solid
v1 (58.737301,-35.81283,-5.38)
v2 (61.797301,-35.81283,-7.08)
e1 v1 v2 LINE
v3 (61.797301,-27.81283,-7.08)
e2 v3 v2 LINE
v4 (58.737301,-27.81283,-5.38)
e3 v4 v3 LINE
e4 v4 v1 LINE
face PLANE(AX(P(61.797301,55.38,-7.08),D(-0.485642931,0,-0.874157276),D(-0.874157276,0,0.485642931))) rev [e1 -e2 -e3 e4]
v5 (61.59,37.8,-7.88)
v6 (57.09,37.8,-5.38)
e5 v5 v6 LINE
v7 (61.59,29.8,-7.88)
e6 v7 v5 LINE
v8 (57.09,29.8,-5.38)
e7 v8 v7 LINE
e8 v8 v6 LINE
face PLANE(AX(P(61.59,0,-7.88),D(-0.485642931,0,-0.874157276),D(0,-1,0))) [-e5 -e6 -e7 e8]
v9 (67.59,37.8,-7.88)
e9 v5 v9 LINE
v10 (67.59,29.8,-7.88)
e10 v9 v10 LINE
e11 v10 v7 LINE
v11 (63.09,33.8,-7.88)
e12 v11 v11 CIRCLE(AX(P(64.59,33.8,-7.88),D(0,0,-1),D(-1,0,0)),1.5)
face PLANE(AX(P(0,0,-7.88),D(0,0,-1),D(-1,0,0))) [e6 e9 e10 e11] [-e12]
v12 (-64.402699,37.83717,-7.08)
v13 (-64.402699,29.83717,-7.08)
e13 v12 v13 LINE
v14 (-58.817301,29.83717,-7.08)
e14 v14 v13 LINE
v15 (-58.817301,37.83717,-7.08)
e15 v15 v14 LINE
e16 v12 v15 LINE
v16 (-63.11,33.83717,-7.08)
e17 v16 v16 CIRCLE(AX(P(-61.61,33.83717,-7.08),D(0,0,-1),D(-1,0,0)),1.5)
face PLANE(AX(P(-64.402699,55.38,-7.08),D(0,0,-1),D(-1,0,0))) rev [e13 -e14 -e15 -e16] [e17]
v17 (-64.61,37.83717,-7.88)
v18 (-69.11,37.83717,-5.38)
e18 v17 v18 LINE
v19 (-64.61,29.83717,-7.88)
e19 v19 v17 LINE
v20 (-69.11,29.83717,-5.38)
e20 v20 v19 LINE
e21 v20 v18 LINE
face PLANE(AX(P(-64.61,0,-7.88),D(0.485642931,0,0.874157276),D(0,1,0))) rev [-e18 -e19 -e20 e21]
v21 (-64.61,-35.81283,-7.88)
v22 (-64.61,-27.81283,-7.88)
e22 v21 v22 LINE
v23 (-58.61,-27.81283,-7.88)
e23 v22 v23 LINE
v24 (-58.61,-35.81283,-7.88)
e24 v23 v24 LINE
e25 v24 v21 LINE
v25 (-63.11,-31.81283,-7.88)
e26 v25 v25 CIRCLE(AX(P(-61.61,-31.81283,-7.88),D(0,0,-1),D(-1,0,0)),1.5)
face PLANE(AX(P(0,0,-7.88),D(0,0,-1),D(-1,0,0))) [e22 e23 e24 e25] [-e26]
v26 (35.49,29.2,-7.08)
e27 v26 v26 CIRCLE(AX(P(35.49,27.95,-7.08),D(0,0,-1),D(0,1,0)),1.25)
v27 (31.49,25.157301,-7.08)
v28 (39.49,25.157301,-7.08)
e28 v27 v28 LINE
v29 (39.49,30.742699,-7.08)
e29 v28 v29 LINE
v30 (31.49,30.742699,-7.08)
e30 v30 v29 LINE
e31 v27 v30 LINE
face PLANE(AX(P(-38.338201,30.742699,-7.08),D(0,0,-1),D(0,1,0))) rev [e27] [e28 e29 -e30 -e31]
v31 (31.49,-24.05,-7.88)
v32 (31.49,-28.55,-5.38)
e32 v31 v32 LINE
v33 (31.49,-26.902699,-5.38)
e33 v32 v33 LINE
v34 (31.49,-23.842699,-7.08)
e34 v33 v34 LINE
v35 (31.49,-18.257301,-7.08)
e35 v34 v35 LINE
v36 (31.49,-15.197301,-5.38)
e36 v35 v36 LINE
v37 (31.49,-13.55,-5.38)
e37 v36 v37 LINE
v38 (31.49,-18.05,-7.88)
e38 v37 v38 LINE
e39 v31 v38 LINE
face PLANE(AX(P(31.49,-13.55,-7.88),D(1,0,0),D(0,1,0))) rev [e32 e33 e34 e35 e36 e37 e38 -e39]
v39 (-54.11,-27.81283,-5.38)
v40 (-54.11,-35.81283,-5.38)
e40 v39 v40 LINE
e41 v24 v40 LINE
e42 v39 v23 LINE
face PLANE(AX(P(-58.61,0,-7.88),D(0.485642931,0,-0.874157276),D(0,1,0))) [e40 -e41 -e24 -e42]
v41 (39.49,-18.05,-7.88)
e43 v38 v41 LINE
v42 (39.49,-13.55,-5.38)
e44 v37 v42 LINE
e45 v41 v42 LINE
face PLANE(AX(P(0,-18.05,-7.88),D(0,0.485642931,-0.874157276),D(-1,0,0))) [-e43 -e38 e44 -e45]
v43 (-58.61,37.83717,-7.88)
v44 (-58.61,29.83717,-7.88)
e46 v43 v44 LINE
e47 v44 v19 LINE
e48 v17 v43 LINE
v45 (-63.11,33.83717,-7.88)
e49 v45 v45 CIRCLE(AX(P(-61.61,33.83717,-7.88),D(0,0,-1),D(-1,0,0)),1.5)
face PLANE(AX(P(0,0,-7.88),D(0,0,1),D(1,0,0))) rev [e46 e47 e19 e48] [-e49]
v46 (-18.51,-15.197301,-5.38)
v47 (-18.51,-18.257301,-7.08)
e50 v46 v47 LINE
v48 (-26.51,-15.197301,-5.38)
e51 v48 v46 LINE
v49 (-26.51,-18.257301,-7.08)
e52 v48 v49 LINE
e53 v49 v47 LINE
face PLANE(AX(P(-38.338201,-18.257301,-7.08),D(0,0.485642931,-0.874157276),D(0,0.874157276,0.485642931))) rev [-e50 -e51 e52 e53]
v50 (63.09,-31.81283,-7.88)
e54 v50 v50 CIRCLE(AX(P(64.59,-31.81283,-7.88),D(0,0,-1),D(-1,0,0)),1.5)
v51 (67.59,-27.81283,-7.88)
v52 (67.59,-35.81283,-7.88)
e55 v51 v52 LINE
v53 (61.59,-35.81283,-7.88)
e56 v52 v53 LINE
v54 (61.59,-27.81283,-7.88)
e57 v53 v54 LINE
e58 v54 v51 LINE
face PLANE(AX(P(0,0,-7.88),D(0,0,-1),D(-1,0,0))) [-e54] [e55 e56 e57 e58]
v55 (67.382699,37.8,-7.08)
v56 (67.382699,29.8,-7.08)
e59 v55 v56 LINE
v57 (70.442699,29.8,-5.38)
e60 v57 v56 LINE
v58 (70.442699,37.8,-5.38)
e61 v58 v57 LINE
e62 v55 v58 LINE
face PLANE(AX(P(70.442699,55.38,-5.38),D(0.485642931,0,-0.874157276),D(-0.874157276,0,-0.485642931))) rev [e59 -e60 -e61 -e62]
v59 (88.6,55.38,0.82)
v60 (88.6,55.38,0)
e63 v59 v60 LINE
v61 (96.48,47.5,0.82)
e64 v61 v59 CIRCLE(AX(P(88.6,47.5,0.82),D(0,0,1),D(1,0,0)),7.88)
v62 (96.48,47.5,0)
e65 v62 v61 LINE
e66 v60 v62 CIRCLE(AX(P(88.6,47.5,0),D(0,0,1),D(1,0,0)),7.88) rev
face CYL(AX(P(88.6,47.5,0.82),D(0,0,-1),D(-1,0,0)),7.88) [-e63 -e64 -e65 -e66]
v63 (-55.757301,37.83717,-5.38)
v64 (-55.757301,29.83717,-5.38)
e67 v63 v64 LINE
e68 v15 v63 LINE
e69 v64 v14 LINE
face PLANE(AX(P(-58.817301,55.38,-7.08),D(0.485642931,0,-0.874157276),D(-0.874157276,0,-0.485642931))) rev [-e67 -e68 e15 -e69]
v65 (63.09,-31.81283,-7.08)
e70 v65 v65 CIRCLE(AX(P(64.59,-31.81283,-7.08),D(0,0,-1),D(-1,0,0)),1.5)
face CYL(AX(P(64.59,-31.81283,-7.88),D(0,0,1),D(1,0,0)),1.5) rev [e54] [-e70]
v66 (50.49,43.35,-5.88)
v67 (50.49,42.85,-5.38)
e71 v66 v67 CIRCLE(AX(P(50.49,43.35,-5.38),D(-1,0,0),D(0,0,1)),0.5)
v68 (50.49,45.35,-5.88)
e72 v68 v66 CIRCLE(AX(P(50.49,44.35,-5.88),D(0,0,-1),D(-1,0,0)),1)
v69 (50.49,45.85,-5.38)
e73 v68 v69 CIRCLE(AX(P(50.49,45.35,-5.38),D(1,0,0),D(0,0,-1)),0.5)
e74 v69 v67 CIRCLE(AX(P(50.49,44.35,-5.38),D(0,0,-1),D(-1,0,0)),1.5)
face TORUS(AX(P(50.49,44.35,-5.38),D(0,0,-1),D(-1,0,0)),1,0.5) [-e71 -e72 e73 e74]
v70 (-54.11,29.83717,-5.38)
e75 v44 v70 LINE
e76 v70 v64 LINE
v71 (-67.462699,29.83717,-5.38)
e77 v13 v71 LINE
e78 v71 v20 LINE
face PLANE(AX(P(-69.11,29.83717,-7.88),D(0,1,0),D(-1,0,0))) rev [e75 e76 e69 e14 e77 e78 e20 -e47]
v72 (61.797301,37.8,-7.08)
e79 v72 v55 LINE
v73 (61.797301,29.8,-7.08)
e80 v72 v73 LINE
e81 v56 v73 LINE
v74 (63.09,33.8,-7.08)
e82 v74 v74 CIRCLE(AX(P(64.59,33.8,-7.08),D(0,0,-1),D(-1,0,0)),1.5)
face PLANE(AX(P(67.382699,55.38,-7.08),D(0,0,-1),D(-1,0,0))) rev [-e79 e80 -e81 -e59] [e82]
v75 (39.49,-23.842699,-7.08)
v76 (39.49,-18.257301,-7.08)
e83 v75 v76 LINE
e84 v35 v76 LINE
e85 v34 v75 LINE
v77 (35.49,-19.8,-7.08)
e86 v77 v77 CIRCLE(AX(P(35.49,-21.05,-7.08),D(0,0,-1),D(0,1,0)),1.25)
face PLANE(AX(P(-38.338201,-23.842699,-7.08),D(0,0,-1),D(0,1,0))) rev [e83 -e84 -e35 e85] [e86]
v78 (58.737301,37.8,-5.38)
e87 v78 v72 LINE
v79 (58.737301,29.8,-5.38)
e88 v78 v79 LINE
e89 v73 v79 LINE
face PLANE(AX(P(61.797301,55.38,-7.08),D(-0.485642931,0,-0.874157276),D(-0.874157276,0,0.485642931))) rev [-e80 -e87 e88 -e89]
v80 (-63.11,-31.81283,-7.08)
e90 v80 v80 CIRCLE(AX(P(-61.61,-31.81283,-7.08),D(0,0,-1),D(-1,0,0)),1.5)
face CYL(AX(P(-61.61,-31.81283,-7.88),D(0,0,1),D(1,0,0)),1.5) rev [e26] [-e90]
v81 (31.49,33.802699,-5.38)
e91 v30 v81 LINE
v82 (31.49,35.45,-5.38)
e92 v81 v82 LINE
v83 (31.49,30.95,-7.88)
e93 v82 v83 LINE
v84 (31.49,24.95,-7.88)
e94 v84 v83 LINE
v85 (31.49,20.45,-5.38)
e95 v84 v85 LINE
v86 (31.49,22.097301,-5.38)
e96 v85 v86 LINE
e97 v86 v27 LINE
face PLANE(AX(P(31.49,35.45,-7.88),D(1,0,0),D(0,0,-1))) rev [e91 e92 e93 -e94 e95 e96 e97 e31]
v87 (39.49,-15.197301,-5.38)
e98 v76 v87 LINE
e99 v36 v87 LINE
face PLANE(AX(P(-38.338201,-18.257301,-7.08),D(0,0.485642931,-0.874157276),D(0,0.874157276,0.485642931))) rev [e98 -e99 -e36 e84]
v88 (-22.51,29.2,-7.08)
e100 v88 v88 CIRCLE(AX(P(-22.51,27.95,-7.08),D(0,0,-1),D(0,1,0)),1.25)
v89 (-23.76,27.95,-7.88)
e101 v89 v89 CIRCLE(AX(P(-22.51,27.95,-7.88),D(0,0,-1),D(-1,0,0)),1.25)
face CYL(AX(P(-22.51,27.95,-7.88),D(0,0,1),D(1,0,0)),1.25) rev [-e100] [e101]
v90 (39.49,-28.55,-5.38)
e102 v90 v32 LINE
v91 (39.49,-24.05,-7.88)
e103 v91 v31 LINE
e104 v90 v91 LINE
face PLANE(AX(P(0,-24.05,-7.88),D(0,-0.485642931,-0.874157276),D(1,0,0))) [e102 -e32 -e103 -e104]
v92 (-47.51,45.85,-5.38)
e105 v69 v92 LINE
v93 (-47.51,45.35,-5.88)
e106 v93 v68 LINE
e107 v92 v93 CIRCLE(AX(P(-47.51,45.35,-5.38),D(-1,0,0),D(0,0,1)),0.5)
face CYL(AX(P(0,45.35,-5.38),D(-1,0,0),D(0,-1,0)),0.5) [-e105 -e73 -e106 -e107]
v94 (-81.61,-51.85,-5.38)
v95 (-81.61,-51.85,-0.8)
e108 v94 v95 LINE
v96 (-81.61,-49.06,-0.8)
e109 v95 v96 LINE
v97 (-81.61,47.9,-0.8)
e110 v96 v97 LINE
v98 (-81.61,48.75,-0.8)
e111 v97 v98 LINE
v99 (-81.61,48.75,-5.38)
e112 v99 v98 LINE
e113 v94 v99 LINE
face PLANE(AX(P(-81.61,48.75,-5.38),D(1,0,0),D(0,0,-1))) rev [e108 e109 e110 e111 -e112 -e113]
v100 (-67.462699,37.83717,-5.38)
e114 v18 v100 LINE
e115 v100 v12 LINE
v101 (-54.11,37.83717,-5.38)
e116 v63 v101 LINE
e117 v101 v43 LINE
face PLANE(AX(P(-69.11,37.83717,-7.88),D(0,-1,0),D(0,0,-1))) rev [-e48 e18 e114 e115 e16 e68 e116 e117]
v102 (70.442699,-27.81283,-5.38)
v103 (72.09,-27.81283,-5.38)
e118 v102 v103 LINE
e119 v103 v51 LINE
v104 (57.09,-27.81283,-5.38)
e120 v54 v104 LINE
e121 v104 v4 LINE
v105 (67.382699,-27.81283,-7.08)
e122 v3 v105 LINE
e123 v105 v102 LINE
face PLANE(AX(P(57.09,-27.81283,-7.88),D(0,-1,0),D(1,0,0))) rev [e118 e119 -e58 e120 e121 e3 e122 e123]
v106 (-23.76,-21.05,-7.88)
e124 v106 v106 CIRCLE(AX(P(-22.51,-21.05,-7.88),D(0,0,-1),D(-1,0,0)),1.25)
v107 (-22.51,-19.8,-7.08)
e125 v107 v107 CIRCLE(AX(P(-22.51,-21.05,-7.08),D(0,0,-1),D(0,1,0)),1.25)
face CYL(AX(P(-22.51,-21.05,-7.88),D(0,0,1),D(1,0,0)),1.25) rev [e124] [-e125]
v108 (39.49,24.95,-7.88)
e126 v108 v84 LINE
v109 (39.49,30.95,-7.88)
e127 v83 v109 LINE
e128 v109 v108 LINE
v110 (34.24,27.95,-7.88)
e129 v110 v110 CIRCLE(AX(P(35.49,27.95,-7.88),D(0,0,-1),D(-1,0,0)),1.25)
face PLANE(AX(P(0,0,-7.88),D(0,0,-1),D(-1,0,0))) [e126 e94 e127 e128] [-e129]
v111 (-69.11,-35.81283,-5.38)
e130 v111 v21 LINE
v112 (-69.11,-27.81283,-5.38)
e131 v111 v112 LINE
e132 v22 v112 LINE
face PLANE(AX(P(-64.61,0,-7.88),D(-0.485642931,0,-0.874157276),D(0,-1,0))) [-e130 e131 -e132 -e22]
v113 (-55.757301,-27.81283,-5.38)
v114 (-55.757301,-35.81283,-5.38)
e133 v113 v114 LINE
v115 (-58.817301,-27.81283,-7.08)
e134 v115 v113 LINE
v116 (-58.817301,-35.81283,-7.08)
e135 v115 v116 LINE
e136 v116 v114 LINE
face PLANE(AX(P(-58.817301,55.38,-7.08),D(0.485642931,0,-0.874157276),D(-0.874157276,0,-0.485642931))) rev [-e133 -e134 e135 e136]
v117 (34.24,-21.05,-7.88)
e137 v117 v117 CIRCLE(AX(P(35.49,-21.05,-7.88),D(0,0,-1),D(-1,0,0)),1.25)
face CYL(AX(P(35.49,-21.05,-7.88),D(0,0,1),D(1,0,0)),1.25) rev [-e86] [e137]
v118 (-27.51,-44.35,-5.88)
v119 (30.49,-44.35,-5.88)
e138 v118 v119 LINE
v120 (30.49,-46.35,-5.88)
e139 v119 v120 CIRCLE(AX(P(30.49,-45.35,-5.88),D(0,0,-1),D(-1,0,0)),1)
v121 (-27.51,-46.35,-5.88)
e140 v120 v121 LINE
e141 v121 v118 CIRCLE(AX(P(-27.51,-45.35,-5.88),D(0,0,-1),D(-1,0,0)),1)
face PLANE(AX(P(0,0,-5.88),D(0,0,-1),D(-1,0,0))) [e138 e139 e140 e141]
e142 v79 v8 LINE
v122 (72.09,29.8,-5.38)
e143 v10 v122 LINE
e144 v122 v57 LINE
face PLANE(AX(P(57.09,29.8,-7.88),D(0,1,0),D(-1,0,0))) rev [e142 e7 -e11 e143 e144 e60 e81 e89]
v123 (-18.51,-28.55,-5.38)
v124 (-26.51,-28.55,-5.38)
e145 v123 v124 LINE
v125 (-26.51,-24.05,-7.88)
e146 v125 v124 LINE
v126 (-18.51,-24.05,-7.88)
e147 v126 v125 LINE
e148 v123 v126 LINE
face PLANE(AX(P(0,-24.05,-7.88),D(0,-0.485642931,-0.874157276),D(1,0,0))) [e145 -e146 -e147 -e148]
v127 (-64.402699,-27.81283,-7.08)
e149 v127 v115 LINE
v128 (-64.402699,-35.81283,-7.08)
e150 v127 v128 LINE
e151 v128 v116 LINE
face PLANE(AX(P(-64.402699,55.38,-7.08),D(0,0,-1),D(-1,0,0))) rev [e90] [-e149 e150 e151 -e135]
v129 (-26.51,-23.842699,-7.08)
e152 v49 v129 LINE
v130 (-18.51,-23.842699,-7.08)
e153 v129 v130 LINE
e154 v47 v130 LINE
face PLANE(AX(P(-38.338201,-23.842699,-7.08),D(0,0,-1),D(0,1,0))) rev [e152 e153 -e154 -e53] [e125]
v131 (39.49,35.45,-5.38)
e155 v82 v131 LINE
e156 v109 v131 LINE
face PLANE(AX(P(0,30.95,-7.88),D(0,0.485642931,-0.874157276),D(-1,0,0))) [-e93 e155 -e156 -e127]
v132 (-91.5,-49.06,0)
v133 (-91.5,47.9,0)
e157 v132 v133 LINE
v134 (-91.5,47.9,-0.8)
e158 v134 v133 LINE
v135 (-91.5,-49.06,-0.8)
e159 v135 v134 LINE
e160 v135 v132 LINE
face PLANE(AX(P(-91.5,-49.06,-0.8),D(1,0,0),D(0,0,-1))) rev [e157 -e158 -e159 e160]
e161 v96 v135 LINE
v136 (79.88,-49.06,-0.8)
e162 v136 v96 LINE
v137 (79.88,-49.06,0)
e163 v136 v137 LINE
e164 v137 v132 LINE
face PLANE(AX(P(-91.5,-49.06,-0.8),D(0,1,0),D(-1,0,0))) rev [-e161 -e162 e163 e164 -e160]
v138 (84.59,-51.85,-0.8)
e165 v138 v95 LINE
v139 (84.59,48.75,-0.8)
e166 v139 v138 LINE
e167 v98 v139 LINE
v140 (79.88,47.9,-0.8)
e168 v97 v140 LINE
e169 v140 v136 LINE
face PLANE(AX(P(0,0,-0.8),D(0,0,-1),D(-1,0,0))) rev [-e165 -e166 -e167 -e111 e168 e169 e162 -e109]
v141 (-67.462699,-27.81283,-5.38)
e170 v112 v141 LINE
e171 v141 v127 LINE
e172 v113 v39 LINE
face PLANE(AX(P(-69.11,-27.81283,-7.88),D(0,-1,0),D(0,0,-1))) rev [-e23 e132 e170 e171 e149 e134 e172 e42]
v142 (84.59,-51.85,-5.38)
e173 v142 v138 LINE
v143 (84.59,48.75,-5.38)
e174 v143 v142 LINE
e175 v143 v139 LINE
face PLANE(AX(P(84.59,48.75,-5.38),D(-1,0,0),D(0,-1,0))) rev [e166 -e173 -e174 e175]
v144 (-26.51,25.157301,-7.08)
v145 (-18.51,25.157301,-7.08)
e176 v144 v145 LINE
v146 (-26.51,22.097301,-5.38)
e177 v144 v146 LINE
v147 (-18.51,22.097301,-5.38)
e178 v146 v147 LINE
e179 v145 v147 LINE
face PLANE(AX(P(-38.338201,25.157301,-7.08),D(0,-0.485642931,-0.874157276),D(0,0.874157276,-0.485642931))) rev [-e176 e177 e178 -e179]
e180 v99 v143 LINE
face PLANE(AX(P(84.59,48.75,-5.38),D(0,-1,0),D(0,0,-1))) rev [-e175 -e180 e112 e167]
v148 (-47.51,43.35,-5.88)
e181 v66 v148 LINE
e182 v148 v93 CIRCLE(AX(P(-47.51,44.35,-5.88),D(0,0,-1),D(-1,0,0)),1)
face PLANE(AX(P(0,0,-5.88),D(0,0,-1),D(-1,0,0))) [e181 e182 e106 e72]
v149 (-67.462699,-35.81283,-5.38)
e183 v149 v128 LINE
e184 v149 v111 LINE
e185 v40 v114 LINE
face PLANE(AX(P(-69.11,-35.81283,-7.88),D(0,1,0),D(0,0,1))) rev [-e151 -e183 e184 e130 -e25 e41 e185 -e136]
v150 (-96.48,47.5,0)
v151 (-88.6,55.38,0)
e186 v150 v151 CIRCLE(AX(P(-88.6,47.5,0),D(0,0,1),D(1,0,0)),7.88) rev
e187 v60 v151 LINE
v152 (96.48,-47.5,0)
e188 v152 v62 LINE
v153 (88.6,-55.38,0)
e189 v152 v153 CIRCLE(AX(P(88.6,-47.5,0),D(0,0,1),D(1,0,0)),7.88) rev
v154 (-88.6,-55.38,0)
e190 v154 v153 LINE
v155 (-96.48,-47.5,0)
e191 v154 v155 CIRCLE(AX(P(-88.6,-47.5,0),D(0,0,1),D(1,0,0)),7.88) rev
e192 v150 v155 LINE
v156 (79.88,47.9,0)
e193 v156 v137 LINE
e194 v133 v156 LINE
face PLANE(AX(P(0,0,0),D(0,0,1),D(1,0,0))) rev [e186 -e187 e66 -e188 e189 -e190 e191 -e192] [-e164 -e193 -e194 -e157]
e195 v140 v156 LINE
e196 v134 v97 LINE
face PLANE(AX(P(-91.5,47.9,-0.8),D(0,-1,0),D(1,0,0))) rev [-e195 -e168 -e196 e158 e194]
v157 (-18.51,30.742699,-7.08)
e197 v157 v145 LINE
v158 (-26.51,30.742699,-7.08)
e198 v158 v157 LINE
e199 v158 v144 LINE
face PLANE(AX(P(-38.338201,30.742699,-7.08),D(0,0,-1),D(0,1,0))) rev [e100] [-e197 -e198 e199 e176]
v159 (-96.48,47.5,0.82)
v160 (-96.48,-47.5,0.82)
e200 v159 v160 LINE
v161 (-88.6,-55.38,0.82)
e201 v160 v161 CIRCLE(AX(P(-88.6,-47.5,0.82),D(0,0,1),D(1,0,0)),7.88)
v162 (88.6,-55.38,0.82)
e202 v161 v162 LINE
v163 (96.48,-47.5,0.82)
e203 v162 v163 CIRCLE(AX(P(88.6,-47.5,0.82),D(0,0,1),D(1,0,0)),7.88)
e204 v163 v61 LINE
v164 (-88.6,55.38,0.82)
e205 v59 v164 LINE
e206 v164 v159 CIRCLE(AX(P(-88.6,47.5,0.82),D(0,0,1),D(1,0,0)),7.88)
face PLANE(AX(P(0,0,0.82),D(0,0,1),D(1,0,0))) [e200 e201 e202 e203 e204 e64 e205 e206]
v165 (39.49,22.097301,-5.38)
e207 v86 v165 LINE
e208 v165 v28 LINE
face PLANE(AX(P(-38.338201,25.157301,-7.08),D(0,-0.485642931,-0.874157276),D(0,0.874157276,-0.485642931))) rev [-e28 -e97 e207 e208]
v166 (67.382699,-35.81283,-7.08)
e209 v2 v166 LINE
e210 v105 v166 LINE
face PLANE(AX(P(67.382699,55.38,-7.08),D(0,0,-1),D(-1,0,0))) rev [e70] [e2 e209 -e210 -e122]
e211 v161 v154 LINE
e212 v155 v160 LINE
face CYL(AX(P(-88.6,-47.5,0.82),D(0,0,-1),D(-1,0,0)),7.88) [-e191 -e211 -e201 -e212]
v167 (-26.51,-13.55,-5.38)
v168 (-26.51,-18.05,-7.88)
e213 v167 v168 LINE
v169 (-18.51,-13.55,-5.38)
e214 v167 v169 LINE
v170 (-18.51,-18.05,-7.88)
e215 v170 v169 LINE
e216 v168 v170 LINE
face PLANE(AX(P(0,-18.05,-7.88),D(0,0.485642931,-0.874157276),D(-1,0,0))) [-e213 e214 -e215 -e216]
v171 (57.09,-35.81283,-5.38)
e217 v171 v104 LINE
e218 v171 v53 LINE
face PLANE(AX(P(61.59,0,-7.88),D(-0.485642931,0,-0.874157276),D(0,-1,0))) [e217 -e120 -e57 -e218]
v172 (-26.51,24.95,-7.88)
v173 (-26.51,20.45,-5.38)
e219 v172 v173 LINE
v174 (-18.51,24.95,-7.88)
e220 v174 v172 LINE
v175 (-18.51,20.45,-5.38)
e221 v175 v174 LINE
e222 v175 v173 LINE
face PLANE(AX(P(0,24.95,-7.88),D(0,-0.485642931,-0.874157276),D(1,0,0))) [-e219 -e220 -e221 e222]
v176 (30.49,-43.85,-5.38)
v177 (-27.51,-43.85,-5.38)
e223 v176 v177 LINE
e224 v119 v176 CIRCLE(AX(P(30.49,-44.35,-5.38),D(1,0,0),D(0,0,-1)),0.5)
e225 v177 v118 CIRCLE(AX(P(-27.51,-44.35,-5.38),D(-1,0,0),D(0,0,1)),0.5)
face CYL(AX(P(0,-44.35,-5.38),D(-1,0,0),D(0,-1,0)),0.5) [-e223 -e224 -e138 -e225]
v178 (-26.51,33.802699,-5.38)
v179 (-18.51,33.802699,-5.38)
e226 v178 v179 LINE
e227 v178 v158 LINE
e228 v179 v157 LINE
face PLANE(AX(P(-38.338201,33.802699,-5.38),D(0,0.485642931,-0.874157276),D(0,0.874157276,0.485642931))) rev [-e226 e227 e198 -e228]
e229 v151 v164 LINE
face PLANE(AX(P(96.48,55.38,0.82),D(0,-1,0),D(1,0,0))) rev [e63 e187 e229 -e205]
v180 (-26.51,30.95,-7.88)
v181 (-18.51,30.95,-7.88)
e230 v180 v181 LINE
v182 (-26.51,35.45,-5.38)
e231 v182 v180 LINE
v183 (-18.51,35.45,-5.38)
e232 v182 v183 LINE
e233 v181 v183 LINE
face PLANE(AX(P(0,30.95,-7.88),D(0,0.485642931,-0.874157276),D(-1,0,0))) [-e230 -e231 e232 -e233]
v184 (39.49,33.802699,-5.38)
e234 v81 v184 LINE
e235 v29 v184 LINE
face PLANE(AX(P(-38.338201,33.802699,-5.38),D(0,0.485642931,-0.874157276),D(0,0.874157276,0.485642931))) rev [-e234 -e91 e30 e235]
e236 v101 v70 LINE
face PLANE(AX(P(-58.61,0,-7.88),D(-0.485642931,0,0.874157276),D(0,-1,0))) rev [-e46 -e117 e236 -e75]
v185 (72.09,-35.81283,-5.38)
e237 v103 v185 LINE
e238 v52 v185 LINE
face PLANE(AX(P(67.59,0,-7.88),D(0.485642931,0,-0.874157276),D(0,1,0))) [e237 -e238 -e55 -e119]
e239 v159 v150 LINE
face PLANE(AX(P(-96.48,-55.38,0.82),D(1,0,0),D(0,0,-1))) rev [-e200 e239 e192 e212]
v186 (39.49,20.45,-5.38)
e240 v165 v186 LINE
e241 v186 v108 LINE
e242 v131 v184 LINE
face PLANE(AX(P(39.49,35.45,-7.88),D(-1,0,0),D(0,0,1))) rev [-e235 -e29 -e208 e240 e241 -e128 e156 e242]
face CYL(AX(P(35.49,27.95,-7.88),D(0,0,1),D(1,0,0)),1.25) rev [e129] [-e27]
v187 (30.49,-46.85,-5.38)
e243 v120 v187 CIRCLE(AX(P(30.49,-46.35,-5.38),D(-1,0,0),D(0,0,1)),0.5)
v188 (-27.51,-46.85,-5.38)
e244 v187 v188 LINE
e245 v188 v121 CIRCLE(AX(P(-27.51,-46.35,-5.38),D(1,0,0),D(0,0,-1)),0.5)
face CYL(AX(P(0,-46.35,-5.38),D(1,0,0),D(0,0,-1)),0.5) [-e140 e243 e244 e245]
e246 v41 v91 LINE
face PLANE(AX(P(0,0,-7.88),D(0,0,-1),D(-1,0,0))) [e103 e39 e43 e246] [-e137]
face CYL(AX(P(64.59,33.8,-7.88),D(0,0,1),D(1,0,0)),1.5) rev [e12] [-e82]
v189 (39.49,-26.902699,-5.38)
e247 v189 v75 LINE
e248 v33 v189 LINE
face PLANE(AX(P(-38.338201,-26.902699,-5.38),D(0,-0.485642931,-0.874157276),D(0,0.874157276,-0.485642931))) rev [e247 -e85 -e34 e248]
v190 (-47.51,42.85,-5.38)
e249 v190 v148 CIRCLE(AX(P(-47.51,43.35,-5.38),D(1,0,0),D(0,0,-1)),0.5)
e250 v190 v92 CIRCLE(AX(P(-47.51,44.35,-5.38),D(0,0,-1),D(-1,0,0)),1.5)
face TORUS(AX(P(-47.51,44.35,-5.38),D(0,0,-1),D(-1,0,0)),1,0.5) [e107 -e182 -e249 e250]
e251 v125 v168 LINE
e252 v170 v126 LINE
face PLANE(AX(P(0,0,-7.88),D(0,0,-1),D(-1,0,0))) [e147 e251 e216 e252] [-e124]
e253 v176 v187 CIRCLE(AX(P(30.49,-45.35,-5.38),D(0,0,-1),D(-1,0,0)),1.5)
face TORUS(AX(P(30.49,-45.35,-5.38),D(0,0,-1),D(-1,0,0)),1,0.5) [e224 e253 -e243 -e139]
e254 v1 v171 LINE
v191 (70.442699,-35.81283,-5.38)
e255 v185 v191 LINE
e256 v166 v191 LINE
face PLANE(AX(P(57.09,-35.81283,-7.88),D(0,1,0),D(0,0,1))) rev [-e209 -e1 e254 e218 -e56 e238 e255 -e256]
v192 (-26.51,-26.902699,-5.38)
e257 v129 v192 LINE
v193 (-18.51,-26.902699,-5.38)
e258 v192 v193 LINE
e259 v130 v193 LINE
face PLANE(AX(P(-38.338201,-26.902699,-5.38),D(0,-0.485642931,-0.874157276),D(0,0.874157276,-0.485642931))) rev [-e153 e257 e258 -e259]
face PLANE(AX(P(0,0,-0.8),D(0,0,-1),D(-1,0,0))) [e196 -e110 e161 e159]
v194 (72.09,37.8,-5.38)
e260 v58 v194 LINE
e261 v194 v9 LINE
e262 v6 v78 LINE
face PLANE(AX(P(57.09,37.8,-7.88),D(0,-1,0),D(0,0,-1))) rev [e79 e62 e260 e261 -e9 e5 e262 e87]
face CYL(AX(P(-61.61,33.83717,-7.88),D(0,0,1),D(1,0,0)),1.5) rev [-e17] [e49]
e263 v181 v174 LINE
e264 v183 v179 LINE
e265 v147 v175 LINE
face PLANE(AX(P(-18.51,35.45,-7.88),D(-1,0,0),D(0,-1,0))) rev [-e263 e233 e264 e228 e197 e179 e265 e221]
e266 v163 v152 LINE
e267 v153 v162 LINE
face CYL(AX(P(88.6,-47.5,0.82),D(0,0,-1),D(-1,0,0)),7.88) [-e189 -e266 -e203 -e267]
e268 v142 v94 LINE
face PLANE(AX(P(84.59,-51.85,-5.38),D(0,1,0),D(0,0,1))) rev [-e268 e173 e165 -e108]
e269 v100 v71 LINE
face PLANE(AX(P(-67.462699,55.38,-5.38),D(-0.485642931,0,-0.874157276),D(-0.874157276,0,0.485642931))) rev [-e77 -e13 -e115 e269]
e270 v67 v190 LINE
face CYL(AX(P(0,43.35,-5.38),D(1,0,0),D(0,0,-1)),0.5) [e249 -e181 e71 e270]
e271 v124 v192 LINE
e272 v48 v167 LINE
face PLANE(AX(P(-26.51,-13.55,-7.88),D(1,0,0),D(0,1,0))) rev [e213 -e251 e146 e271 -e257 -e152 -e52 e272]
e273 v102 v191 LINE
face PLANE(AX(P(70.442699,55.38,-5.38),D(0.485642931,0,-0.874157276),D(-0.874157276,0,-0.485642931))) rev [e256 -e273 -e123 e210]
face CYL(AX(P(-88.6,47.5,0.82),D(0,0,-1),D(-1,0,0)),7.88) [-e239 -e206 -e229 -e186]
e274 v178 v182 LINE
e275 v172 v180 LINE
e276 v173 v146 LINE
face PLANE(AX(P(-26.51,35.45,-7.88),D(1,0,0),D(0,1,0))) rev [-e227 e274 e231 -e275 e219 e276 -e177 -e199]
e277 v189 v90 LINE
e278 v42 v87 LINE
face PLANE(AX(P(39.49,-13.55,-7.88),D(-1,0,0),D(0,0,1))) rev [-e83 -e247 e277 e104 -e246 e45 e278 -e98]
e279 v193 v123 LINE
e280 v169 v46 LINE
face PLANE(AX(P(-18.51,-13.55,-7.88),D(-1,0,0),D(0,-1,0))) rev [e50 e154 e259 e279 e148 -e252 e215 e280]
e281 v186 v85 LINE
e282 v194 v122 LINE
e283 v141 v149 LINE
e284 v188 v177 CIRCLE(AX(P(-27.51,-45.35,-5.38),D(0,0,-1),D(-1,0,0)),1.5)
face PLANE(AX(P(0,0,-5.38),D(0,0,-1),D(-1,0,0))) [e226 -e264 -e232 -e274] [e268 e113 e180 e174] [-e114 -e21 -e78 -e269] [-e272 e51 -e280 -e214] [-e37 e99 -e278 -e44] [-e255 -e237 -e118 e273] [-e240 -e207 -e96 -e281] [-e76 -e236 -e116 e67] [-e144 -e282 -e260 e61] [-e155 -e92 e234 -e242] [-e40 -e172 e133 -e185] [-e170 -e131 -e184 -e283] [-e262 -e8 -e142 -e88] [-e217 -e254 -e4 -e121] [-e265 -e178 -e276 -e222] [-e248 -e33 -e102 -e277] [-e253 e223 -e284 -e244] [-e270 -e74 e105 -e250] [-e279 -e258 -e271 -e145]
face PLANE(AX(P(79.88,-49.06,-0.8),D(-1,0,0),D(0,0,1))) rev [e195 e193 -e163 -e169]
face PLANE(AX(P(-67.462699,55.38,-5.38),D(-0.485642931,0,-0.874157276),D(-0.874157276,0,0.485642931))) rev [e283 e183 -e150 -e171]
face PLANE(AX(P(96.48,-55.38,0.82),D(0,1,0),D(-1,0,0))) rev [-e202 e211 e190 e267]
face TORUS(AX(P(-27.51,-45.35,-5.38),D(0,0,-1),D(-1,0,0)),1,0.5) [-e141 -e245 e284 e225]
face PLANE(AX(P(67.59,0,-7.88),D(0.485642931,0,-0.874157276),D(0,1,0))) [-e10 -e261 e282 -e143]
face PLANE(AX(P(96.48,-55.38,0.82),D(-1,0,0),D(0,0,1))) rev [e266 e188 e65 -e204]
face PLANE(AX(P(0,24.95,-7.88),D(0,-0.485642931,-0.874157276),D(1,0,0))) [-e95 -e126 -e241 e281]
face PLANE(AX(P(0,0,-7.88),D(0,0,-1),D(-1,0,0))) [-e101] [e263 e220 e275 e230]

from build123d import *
from OCP.BRepFilletAPI import BRepFilletAPI_MakeChamfer

# Parameters (mm, degrees)
ESQUISSE1_W             = 192.96
ESQUISSE1_H             = 110.76
C_VITRE_DEPTH           = 0.82
CONG_1_R                = 7.88
ESQUISSE2_W             = 171.38
ESQUISSE2_H             = 96.96
C_TOUCH_DEPTH           = 0.8
ESQUISSE3_W             = 166.2
ESQUISSE3_H             = 100.6
BOSS_EXTRU_3_DEPTH      = 4.58
ESQUISSE4_W             = 15
ESQUISSE4_H             = 8
ESQUISSE4_R             = 1.5
ESQUISSE4_W_2           = 8
ESQUISSE4_H_2           = 15
ESQUISSE4_R_2           = 1.25
BOSS_EXTRU_4_DEPTH      = 2.5
CHANFREIN1_SIZE         = 2.5
CHANFREIN1_SIZE_2       = 4.5
BOSS_EXTRU_5_DEPTH      = 0.5
CONG_2_R                = 0.5
ENL_V_MAT_EXTRU_1_DEPTH = 133.991041409
ENL_V_MAT_EXTRU_2_REACH = 149.027
ENL_V_MAT_EXTRU_3_REACH = 149.027


with BuildPart() as part:
    # Esquisse1 → c_vitre (new body)
    with BuildSketch(Plane.XY):
        Rectangle(ESQUISSE1_W, ESQUISSE1_H)
    extrude(amount=C_VITRE_DEPTH)

    # Congé1
    cong_1_edges = [part.edges().sort_by_distance(p)[0] for p in [
        (-96.48, 55.38, 0.41),
        (96.48, 55.38, 0.41),
        (96.48, -55.38, 0.41),
        (-96.48, -55.38, 0.41),
    ]]
    fillet(cong_1_edges, radius=CONG_1_R)

    # Esquisse2 → c_touch (add)
    with BuildSketch(Plane(origin=(0, 0, 0), x_dir=(-1, 0, 0), z_dir=(0, 0, -1))):
        with Locations((5.81, -0.58)):
            Rectangle(ESQUISSE2_W, ESQUISSE2_H)
    extrude(amount=C_TOUCH_DEPTH)

    # Esquisse3 → Boss.-Extru.3 (add)
    with BuildSketch(Plane(origin=(0, 0, -0.8), x_dir=(-1, 0, 0), z_dir=(0, 0, -1))):
        with Locations((-1.49, -1.55)):
            Rectangle(ESQUISSE3_W, ESQUISSE3_H)
    extrude(amount=BOSS_EXTRU_3_DEPTH)

    # Esquisse4 → Boss.-Extru.4 (add)
    # profile 1 of 8: a face of its own
    with BuildSketch(Plane(origin=(0, 0, -5.38), x_dir=(-1, 0, 0), z_dir=(0, 0, -1))):
        with Locations((-64.59, 33.8)):
            Rectangle(ESQUISSE4_W, ESQUISSE4_H)
        with Locations((-64.59, 33.8)):
            Circle(ESQUISSE4_R, mode=Mode.SUBTRACT)
    # profile 2 of 8: a face of its own
    with BuildSketch(Plane(origin=(0, 0, -5.38), x_dir=(-1, 0, 0), z_dir=(0, 0, -1))):
        with Locations((-64.59, -31.812830284)):
            Rectangle(ESQUISSE4_W, ESQUISSE4_H)
        with Locations((-64.59, -31.812830284)):
            Circle(ESQUISSE4_R, mode=Mode.SUBTRACT)
    # profile 3 of 8: a face of its own
    with BuildSketch(Plane(origin=(0, 0, -5.38), x_dir=(-1, 0, 0), z_dir=(0, 0, -1))):
        with Locations((61.61, -31.812830284)):
            Rectangle(ESQUISSE4_W, ESQUISSE4_H)
        with Locations((61.61, -31.812830284)):
            Circle(ESQUISSE4_R, mode=Mode.SUBTRACT)
    # profile 4 of 8: a face of its own
    with BuildSketch(Plane(origin=(0, 0, -5.38), x_dir=(-1, 0, 0), z_dir=(0, 0, -1))):
        with Locations((61.61, 33.837169716)):
            Rectangle(ESQUISSE4_W, ESQUISSE4_H)
        with Locations((61.61, 33.837169716)):
            Circle(ESQUISSE4_R, mode=Mode.SUBTRACT)
    # profile 5 of 8: a face of its own
    with BuildSketch(Plane(origin=(0, 0, -5.38), x_dir=(-1, 0, 0), z_dir=(0, 0, -1))):
        with Locations((-35.49, 27.95)):
            Rectangle(ESQUISSE4_W_2, ESQUISSE4_H_2)
        with Locations((-35.49, 27.95)):
            Circle(ESQUISSE4_R_2, mode=Mode.SUBTRACT)
    # profile 6 of 8: a face of its own
    with BuildSketch(Plane(origin=(0, 0, -5.38), x_dir=(-1, 0, 0), z_dir=(0, 0, -1))):
        with Locations((-35.49, -21.05)):
            Rectangle(ESQUISSE4_W_2, ESQUISSE4_H_2)
        with Locations((-35.49, -21.05)):
            Circle(ESQUISSE4_R_2, mode=Mode.SUBTRACT)
    # profile 7 of 8: a face of its own
    with BuildSketch(Plane(origin=(0, 0, -5.38), x_dir=(-1, 0, 0), z_dir=(0, 0, -1))):
        with Locations((22.51, -21.05)):
            Rectangle(ESQUISSE4_W_2, ESQUISSE4_H_2)
        with Locations((22.51, -21.05)):
            Circle(ESQUISSE4_R_2, mode=Mode.SUBTRACT)
    # profile 8 of 8: a face of its own
    with BuildSketch(Plane(origin=(0, 0, -5.38), x_dir=(-1, 0, 0), z_dir=(0, 0, -1))):
        with Locations((22.51, 27.95)):
            Rectangle(ESQUISSE4_W_2, ESQUISSE4_H_2)
        with Locations((22.51, 27.95)):
            Circle(ESQUISSE4_R_2, mode=Mode.SUBTRACT)
    extrude(amount=BOSS_EXTRU_4_DEPTH)

    # Chanfrein1
    chanfrein1_edges_1 = [part.edges().sort_by_distance(p)[0] for p in [
        (-69.11, -31.812830284, -7.88),
    ]]
    chanfrein1_side_1 = [part.faces().sort_by_distance(p)[0] for p in [
        (-69.11, -31.812830284, -7.83),
    ]]
    chanfrein1_edges_2 = [part.edges().sort_by_distance(p)[0] for p in [
        (-54.11, -31.812830284, -7.88),
    ]]
    chanfrein1_side_2 = [part.faces().sort_by_distance(p)[0] for p in [
        (-54.11, -31.812830284, -7.83),
    ]]
    chanfrein1_edges_3 = [part.edges().sort_by_distance(p)[0] for p in [
        (-22.51, -28.55, -7.88),
    ]]
    chanfrein1_side_3 = [part.faces().sort_by_distance(p)[0] for p in [
        (-22.51, -28.55, -7.83),
    ]]
    chanfrein1_edges_4 = [part.edges().sort_by_distance(p)[0] for p in [
        (-22.51, -13.55, -7.88),
    ]]
    chanfrein1_side_4 = [part.faces().sort_by_distance(p)[0] for p in [
        (-22.51, -13.55, -7.83),
    ]]
    chanfrein1_edges_5 = [part.edges().sort_by_distance(p)[0] for p in [
        (-69.11, 33.837169716, -7.88),
    ]]
    chanfrein1_side_5 = [part.faces().sort_by_distance(p)[0] for p in [
        (-69.11, 33.837169716, -7.83),
    ]]
    chanfrein1_edges_6 = [part.edges().sort_by_distance(p)[0] for p in [
        (-54.11, 33.837169716, -7.88),
    ]]
    chanfrein1_side_6 = [part.faces().sort_by_distance(p)[0] for p in [
        (-54.11, 33.837169716, -7.83),
    ]]
    chanfrein1_edges_7 = [part.edges().sort_by_distance(p)[0] for p in [
        (-22.51, 20.45, -7.88),
    ]]
    chanfrein1_side_7 = [part.faces().sort_by_distance(p)[0] for p in [
        (-22.51, 20.45, -7.83),
    ]]
    chanfrein1_edges_8 = [part.edges().sort_by_distance(p)[0] for p in [
        (-22.51, 35.45, -7.88),
    ]]
    chanfrein1_side_8 = [part.faces().sort_by_distance(p)[0] for p in [
        (-22.51, 35.45, -7.83),
    ]]
    chanfrein1_edges_9 = [part.edges().sort_by_distance(p)[0] for p in [
        (35.49, 35.45, -7.88),
    ]]
    chanfrein1_side_9 = [part.faces().sort_by_distance(p)[0] for p in [
        (35.49, 35.45, -7.83),
    ]]
    chanfrein1_edges_10 = [part.edges().sort_by_distance(p)[0] for p in [
        (57.09, 33.8, -7.88),
    ]]
    chanfrein1_side_10 = [part.faces().sort_by_distance(p)[0] for p in [
        (57.09, 33.8, -7.83),
    ]]
    chanfrein1_edges_11 = [part.edges().sort_by_distance(p)[0] for p in [
        (72.09, 33.8, -7.88),
    ]]
    chanfrein1_side_11 = [part.faces().sort_by_distance(p)[0] for p in [
        (72.09, 33.8, -7.83),
    ]]
    chanfrein1_edges_12 = [part.edges().sort_by_distance(p)[0] for p in [
        (35.49, 20.45, -7.88),
    ]]
    chanfrein1_side_12 = [part.faces().sort_by_distance(p)[0] for p in [
        (35.49, 20.45, -7.83),
    ]]
    chanfrein1_edges_13 = [part.edges().sort_by_distance(p)[0] for p in [
        (35.49, -13.55, -7.88),
    ]]
    chanfrein1_side_13 = [part.faces().sort_by_distance(p)[0] for p in [
        (35.49, -13.55, -7.83),
    ]]
    chanfrein1_edges_14 = [part.edges().sort_by_distance(p)[0] for p in [
        (35.49, -28.55, -7.88),
    ]]
    chanfrein1_side_14 = [part.faces().sort_by_distance(p)[0] for p in [
        (35.49, -28.55, -7.83),
    ]]
    chanfrein1_edges_15 = [part.edges().sort_by_distance(p)[0] for p in [
        (57.09, -31.812830284, -7.88),
    ]]
    chanfrein1_side_15 = [part.faces().sort_by_distance(p)[0] for p in [
        (57.09, -31.812830284, -7.83),
    ]]
    chanfrein1_edges_16 = [part.edges().sort_by_distance(p)[0] for p in [
        (72.09, -31.812830284, -7.88),
    ]]
    chanfrein1_side_16 = [part.faces().sort_by_distance(p)[0] for p in [
        (72.09, -31.812830284, -7.83),
    ]]
    chanfrein1 = BRepFilletAPI_MakeChamfer(part.part.solid().wrapped)
    for e in chanfrein1_edges_1:
        chanfrein1.Add(CHANFREIN1_SIZE - 0.0001, CHANFREIN1_SIZE_2 - 0.0001, e.wrapped, chanfrein1_side_1[0].wrapped)
    for e in chanfrein1_edges_2:
        chanfrein1.Add(CHANFREIN1_SIZE - 0.0001, CHANFREIN1_SIZE_2 - 0.0001, e.wrapped, chanfrein1_side_2[0].wrapped)
    for e in chanfrein1_edges_3:
        chanfrein1.Add(CHANFREIN1_SIZE - 0.0001, CHANFREIN1_SIZE_2 - 0.0001, e.wrapped, chanfrein1_side_3[0].wrapped)
    for e in chanfrein1_edges_4:
        chanfrein1.Add(CHANFREIN1_SIZE - 0.0001, CHANFREIN1_SIZE_2 - 0.0001, e.wrapped, chanfrein1_side_4[0].wrapped)
    for e in chanfrein1_edges_5:
        chanfrein1.Add(CHANFREIN1_SIZE - 0.0001, CHANFREIN1_SIZE_2 - 0.0001, e.wrapped, chanfrein1_side_5[0].wrapped)
    for e in chanfrein1_edges_6:
        chanfrein1.Add(CHANFREIN1_SIZE - 0.0001, CHANFREIN1_SIZE_2 - 0.0001, e.wrapped, chanfrein1_side_6[0].wrapped)
    for e in chanfrein1_edges_7:
        chanfrein1.Add(CHANFREIN1_SIZE - 0.0001, CHANFREIN1_SIZE_2 - 0.0001, e.wrapped, chanfrein1_side_7[0].wrapped)
    for e in chanfrein1_edges_8:
        chanfrein1.Add(CHANFREIN1_SIZE - 0.0001, CHANFREIN1_SIZE_2 - 0.0001, e.wrapped, chanfrein1_side_8[0].wrapped)
    for e in chanfrein1_edges_9:
        chanfrein1.Add(CHANFREIN1_SIZE - 0.0001, CHANFREIN1_SIZE_2 - 0.0001, e.wrapped, chanfrein1_side_9[0].wrapped)
    for e in chanfrein1_edges_10:
        chanfrein1.Add(CHANFREIN1_SIZE - 0.0001, CHANFREIN1_SIZE_2 - 0.0001, e.wrapped, chanfrein1_side_10[0].wrapped)
    for e in chanfrein1_edges_11:
        chanfrein1.Add(CHANFREIN1_SIZE - 0.0001, CHANFREIN1_SIZE_2 - 0.0001, e.wrapped, chanfrein1_side_11[0].wrapped)
    for e in chanfrein1_edges_12:
        chanfrein1.Add(CHANFREIN1_SIZE - 0.0001, CHANFREIN1_SIZE_2 - 0.0001, e.wrapped, chanfrein1_side_12[0].wrapped)
    for e in chanfrein1_edges_13:
        chanfrein1.Add(CHANFREIN1_SIZE - 0.0001, CHANFREIN1_SIZE_2 - 0.0001, e.wrapped, chanfrein1_side_13[0].wrapped)
    for e in chanfrein1_edges_14:
        chanfrein1.Add(CHANFREIN1_SIZE - 0.0001, CHANFREIN1_SIZE_2 - 0.0001, e.wrapped, chanfrein1_side_14[0].wrapped)
    for e in chanfrein1_edges_15:
        chanfrein1.Add(CHANFREIN1_SIZE - 0.0001, CHANFREIN1_SIZE_2 - 0.0001, e.wrapped, chanfrein1_side_15[0].wrapped)
    for e in chanfrein1_edges_16:
        chanfrein1.Add(CHANFREIN1_SIZE - 0.0001, CHANFREIN1_SIZE_2 - 0.0001, e.wrapped, chanfrein1_side_16[0].wrapped)
    add(Compound.cast(chanfrein1.Shape()), mode=Mode.REPLACE)  # a hair under: the kernel refuses the full size

    # Esquisse5 → Boss.-Extru.5 (add)
    with BuildSketch(Plane(origin=(0, 0, -5.38), x_dir=(-1, 0, 0), z_dir=(0, 0, -1))):
        with BuildLine():
            Line((47.51, 45.85), (-50.49, 45.85))
            ThreePointArc((-50.49, 45.85), (-51.99, 44.35), (-50.49, 42.85))
            Line((-50.49, 42.85), (47.51, 42.85))
            ThreePointArc((47.51, 42.85), (49.01, 44.35), (47.51, 45.85))
        make_face()
        with BuildLine():
            Line((27.51, -43.85), (-30.49, -43.85))
            ThreePointArc((-30.49, -43.85), (-31.99, -45.35), (-30.49, -46.85))
            Line((-30.49, -46.85), (27.51, -46.85))
            ThreePointArc((27.51, -46.85), (29.01, -45.35), (27.51, -43.85))
        make_face()
    extrude(amount=BOSS_EXTRU_5_DEPTH)

    # Congé2
    cong_2_edges = [part.edges().sort_by_distance(p)[0] for p in [
        (1.49, 42.85, -5.88),
        (51.99, 44.35, -5.88),
        (1.49, 45.85, -5.88),
        (1.49, -46.85, -5.88),
        (31.99, -45.35, -5.88),
        (1.49, -43.85, -5.88),
        (-49.01, 44.35, -5.88),
        (-29.01, -45.35, -5.88),
    ]]
    fillet(cong_2_edges, radius=CONG_2_R - 0.0001)  # a hair under: the kernel refuses the full size

    # Esquisse7 → Enlèv. mat.-Extru.1 (cut, through all)
    with BuildSketch(Plane.XZ.offset(35.812830284)):
        Polygon((58.737300823, -5.38), (70.442699177, -5.38), (67.382699177, -7.08), (61.797300823, -7.08), align=None)
        Polygon((-67.462699177, -5.38), (-64.402699177, -7.08), (-58.817300823, -7.08), (-55.757300823, -5.38), align=None)
    extrude(amount=-ENL_V_MAT_EXTRU_1_DEPTH, mode=Mode.SUBTRACT)

    # Enlèv. mat.-Extru.2: up to this face of the body (flat: up to its plane)
    enl_v_mat_extru_2_end = Plane(part.part.faces().sort_by_distance((-26.51, -21.05, -6.451430159))[0])
    # Esquisse8 → Enlèv. mat.-Extru.2 (cut, up to the picked face)
    with BuildSketch(Plane(origin=(39.49, 0, 0), x_dir=(0, 0, -1), z_dir=(1, 0, 0)), mode=Mode.PRIVATE) as enl_v_mat_extru_2_sk1:
        Polygon((5.38, -15.197300823), (5.38, -26.902699177), (7.08, -23.842699177), (7.08, -18.257300823), align=None)
    enl_v_mat_extru_2_tool1 = split(extrude(enl_v_mat_extru_2_sk1.sketch, amount=-ENL_V_MAT_EXTRU_2_REACH, mode=Mode.PRIVATE), bisect_by=enl_v_mat_extru_2_end, keep=Keep.BOTH, mode=Mode.PRIVATE)
    add(enl_v_mat_extru_2_tool1.solids().sort_by(Axis((39.49, -21.05, -6.129715), (-1, 0, 0)))[0], mode=Mode.SUBTRACT)

    # Enlèv. mat.-Extru.3: up to this face of the body (flat: up to its plane)
    enl_v_mat_extru_3_end = Plane(part.part.faces().sort_by_distance((-26.51, 27.95, -6.451430159))[0])
    # Esquisse9 → Enlèv. mat.-Extru.3 (cut, up to the picked face)
    with BuildSketch(Plane(origin=(39.49, 0, 0), x_dir=(0, 0, -1), z_dir=(1, 0, 0)), mode=Mode.PRIVATE) as enl_v_mat_extru_3_sk1:
        Polygon((5.38, 22.097300823), (5.38, 33.802699177), (7.08, 30.742699177), (7.08, 25.157300823), align=None)
    enl_v_mat_extru_3_tool1 = split(extrude(enl_v_mat_extru_3_sk1.sketch, amount=-ENL_V_MAT_EXTRU_3_REACH, mode=Mode.PRIVATE), bisect_by=enl_v_mat_extru_3_end, keep=Keep.BOTH, mode=Mode.PRIVATE)
    add(enl_v_mat_extru_3_tool1.solids().sort_by(Axis((39.49, 27.95, -6.129715), (-1, 0, 0)))[0], mode=Mode.SUBTRACT)


solid = part.part
